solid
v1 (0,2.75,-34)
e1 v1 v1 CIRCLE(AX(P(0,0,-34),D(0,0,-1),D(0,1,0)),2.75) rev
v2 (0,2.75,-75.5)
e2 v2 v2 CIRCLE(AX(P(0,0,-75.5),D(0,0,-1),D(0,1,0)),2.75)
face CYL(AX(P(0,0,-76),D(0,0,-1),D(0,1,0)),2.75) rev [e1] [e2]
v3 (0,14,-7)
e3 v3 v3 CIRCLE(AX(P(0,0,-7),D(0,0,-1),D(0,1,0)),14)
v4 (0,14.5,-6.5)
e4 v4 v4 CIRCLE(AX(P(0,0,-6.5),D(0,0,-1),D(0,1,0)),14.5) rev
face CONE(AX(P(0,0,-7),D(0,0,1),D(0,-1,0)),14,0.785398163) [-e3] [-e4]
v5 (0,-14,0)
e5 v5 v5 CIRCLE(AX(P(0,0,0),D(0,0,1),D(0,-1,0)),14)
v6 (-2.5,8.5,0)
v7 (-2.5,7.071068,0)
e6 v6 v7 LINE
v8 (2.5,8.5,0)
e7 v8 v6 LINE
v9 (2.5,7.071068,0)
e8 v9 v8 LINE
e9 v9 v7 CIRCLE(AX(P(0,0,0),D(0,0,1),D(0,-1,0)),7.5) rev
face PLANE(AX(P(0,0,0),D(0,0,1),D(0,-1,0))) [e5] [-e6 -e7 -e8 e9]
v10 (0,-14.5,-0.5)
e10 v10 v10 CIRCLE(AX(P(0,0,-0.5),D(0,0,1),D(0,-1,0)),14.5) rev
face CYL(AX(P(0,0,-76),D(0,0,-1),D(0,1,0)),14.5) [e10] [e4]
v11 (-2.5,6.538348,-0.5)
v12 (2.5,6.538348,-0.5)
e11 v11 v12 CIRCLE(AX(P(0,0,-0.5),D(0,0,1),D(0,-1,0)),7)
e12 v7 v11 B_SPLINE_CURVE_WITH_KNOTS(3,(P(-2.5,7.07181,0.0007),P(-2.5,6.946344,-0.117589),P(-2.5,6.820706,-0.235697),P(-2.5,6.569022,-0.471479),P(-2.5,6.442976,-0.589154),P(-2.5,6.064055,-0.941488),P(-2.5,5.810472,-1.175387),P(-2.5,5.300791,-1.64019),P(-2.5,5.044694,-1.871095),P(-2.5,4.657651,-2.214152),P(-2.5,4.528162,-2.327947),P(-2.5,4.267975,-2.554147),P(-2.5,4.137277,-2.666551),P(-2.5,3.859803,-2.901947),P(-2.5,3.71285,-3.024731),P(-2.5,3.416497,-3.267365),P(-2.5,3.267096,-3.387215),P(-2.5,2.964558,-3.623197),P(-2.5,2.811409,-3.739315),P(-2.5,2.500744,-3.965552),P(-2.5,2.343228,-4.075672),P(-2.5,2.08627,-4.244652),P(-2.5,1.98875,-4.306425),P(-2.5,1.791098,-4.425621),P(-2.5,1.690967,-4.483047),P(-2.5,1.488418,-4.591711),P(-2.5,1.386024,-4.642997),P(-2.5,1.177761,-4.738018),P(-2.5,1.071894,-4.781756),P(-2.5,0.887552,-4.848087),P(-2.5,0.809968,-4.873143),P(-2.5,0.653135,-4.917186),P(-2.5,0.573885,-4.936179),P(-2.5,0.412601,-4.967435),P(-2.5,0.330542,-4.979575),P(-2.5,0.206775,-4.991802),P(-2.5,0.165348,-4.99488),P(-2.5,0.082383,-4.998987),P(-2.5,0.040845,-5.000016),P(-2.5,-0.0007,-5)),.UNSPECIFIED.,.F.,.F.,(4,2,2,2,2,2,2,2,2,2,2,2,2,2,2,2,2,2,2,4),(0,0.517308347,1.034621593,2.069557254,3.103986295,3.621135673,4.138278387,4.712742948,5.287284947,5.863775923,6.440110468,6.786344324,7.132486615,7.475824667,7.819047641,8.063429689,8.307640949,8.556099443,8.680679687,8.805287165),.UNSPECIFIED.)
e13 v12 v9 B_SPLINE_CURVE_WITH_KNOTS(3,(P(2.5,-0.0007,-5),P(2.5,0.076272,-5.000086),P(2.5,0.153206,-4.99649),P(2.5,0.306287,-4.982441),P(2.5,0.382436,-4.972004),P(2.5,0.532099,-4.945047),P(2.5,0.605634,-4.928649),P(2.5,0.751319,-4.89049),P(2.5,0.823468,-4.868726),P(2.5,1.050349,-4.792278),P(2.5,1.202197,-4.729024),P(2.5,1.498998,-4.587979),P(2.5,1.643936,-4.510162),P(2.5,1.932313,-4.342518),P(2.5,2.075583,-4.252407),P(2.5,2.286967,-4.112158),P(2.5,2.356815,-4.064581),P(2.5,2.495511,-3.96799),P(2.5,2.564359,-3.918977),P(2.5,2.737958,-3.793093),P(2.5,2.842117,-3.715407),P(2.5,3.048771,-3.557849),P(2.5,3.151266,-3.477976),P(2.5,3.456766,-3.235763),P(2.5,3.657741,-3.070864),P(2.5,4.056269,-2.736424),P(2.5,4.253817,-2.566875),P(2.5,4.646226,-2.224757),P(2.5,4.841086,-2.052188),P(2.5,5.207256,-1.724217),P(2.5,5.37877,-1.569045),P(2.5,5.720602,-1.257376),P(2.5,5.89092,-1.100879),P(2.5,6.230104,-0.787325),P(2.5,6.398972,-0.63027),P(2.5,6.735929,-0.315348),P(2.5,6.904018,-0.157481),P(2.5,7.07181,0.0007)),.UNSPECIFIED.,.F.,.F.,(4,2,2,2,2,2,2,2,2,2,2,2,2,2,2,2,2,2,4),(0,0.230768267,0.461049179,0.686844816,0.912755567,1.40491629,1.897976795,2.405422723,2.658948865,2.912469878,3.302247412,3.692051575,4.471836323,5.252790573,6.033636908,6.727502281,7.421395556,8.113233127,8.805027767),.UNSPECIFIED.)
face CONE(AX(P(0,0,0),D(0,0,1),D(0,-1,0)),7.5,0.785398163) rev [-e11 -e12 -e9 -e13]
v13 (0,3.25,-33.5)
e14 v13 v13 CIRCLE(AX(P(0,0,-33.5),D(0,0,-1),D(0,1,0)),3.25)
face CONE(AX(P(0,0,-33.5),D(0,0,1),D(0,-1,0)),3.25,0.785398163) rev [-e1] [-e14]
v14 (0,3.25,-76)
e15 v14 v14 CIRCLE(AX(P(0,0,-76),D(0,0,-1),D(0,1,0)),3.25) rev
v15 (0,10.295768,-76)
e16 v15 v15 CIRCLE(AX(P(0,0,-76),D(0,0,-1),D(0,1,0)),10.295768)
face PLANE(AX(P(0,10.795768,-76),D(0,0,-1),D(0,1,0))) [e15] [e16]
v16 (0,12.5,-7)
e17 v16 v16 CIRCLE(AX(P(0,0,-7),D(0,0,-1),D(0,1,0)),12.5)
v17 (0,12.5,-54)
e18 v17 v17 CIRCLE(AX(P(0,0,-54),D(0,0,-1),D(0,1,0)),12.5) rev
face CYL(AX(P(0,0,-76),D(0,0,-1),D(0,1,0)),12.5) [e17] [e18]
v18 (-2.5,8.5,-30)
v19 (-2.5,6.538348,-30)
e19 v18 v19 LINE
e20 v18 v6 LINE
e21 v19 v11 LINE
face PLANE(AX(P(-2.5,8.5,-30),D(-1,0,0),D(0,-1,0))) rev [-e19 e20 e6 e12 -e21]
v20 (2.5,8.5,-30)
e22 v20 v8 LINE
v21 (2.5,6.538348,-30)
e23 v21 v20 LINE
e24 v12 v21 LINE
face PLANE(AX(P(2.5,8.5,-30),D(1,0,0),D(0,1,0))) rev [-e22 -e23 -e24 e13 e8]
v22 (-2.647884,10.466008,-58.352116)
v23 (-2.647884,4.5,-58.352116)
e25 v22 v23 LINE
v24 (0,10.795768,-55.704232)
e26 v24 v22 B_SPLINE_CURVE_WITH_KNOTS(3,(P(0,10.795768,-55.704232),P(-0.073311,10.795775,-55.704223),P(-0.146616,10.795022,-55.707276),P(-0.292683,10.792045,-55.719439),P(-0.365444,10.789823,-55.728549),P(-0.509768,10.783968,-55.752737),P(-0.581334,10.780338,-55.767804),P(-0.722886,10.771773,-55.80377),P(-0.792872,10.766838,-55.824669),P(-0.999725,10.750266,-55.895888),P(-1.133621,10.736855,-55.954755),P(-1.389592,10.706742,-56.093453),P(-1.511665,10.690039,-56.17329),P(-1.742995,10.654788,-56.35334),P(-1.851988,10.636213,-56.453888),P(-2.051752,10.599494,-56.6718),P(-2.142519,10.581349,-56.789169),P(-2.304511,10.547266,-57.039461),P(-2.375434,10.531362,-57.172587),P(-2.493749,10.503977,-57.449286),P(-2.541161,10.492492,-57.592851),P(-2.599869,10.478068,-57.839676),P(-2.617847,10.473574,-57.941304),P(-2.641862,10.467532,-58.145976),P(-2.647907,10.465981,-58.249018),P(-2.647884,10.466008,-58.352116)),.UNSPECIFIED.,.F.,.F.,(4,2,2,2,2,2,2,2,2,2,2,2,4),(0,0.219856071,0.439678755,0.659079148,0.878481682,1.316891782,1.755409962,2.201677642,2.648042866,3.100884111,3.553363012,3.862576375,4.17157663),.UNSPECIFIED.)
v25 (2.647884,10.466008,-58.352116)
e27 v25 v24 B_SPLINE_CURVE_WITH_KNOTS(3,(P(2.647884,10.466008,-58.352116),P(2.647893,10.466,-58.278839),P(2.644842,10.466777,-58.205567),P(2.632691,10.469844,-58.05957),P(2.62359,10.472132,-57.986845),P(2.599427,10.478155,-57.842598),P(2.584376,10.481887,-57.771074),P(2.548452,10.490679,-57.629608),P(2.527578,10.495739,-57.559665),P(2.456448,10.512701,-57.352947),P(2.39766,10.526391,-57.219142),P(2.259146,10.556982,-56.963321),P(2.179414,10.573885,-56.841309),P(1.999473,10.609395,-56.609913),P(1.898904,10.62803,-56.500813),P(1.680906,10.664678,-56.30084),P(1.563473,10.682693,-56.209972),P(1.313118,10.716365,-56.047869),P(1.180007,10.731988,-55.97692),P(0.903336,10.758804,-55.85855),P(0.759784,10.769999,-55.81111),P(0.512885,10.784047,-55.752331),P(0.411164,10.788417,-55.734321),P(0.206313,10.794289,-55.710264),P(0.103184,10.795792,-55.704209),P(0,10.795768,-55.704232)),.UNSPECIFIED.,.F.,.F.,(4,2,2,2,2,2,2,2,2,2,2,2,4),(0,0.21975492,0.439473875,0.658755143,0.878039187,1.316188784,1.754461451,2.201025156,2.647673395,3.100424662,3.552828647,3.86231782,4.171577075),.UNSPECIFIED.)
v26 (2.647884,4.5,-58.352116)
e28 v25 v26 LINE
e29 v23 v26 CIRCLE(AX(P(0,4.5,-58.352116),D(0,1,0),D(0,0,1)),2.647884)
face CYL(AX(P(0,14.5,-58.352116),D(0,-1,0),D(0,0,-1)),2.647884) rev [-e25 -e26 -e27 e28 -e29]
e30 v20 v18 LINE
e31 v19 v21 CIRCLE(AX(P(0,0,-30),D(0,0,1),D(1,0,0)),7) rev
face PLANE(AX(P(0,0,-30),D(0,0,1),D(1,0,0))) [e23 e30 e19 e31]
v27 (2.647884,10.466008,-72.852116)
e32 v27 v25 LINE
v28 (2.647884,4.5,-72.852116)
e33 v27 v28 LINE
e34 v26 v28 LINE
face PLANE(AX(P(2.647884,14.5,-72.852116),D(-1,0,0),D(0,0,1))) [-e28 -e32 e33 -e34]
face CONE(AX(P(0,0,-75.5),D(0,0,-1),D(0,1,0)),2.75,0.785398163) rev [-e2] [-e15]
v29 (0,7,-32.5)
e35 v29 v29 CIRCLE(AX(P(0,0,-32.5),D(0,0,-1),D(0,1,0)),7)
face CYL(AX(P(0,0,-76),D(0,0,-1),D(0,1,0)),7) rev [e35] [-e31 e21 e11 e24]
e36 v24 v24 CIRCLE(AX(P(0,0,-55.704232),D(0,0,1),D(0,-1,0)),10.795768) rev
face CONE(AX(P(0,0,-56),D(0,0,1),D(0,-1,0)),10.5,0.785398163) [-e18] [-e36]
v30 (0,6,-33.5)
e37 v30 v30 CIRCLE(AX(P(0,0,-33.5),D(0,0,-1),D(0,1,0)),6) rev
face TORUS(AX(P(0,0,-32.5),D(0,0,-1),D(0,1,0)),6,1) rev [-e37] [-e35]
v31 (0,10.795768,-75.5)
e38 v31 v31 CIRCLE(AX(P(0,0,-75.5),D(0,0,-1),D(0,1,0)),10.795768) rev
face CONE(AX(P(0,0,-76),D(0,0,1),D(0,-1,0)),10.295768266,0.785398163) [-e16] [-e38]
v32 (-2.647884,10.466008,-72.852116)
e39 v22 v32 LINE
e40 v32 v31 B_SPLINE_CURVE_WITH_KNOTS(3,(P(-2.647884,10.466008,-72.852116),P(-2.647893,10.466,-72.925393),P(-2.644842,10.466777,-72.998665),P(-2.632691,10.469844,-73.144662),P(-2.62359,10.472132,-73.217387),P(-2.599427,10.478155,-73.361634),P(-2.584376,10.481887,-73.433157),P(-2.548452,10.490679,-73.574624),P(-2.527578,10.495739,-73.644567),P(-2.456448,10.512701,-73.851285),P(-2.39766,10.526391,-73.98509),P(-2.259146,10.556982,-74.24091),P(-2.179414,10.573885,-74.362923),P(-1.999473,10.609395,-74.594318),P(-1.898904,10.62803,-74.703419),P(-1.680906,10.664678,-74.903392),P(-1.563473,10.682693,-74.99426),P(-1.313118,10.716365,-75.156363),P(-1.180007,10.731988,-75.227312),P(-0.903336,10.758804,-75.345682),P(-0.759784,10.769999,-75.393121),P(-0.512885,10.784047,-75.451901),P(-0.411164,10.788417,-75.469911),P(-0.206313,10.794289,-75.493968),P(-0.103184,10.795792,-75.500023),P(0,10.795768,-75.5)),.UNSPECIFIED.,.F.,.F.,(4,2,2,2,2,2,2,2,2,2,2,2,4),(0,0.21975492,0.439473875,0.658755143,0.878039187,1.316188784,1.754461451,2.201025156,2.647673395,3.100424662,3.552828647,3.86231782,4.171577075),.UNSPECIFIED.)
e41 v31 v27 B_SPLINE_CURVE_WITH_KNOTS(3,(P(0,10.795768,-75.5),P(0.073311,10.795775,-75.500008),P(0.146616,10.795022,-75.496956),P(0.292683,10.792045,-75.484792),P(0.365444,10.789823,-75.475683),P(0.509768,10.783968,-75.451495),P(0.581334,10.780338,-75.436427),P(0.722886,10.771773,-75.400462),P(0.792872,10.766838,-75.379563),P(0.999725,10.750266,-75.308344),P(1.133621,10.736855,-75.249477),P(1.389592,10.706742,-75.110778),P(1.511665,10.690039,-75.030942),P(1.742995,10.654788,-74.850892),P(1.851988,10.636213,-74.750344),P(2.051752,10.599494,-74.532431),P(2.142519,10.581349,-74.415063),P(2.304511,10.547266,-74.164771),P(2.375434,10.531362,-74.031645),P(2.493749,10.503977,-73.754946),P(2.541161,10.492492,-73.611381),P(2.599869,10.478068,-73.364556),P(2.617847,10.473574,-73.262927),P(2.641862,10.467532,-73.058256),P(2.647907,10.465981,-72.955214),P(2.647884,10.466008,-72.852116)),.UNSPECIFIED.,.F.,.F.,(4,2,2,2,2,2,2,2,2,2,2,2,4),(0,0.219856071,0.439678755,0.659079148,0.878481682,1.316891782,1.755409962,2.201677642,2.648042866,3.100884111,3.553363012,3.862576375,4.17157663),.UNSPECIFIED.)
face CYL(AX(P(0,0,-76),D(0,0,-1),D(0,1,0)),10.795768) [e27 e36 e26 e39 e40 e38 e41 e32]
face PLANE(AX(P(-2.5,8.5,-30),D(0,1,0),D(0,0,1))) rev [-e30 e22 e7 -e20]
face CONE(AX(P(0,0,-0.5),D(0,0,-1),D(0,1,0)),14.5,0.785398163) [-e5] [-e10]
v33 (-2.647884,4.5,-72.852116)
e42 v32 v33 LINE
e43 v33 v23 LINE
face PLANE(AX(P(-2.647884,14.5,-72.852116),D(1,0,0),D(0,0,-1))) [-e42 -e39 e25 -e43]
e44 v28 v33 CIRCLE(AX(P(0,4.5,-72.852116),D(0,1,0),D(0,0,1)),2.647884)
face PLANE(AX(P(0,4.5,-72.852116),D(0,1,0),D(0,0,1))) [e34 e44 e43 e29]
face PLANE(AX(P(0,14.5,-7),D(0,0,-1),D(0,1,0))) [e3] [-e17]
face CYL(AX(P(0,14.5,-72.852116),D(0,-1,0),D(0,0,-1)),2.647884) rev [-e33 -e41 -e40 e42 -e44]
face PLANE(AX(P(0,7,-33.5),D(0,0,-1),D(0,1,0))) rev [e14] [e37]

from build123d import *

# Parameters (mm, degrees)
FILLET_1_R          = 1
CHAMFER_1_SIZE      = 0.5
CHAMFER_2_SIZE      = 2
SKETCH_4_W          = 5
SKETCH_4_H          = 8.5
CUT_EXTRUDE_1_DEPTH = 30
CUT_EXTRUDE_2_DEPTH = 80.669630349


with BuildPart() as part:
    # 草图1 → 旋转1 (revolve)
    with BuildSketch(Plane(origin=(0, 0, 0), x_dir=(0, 0, -1), z_dir=(1, 0, 0))):
        Polygon((0, 0), (0, 14.5), (7, 14.5), (7, 12.5), (56, 12.5), (56, 10.795768266), (76, 10.795768266), (76, 0), align=None)
    revolve(axis=Axis((0, 0, -76), (0, 0, 1)))

    # 草图3 → 切除-旋转1 (revolve, cut)
    with BuildSketch(Plane(origin=(0, 0, 0), x_dir=(0, 0, -1), z_dir=(1, 0, 0))):
        Polygon((0, 0), (0, 7), (33.5, 7), (33.5, 2.75), (76, 2.75), (76, 0), align=None)
    revolve(axis=Axis((0, 0, -76), (0, 0, 1)), mode=Mode.SUBTRACT)

    # 圆角1
    fillet_1_edges = [part.edges().sort_by_distance(p)[0] for p in [
        (0, -7, -33.5),
    ]]
    fillet(fillet_1_edges, radius=FILLET_1_R)

    # 倒角1
    chamfer_1_edges = [part.edges().sort_by_distance(p)[0] for p in [
        (0, -7, 0),
        (0, -2.75, -33.5),
        (0, -2.75, -76),
        (0, -10.795768266, -76),
        (0, -14.5, -7),
        (0, -14.5, 0),
    ]]
    chamfer(chamfer_1_edges, length=CHAMFER_1_SIZE)

    # 倒角2
    # the kernel refuses this chamfer: 2 mm, written as the material it takes off along each edge
    with BuildSketch(Plane(origin=(0, 0, -56), x_dir=(0, 1, 0), z_dir=(1, 0, 0))) as chamfer_2_piece_1_section:
        Polygon((12.5, CHAMFER_2_SIZE), (12.5 - CHAMFER_2_SIZE, 0), (12.5, 0), align=None)
    chamfer_2_piece_1 = revolve(axis=Axis((0, 0, -56), (0, 0, 1)), mode=Mode.PRIVATE)
    chamfer_2_piece_1 = chamfer_2_piece_1 - Plane(origin=(0, 0, -54.862135047), x_dir=(0, 1, 0), z_dir=(0, 0, -1)) * Cylinder(10.795768266, 50, mode=Mode.PRIVATE)
    add(chamfer_2_piece_1, mode=Mode.SUBTRACT)

    # 草图4 → 切除-拉伸1 (cut)
    with BuildSketch(Plane.XY):
        with Locations((0, 4.25)):
            Rectangle(SKETCH_4_W, SKETCH_4_H)
    extrude(amount=-CUT_EXTRUDE_1_DEPTH, mode=Mode.SUBTRACT)

    # 草图5 → 切除-拉伸2 (cut, through all)
    with BuildSketch(Plane(origin=(0, 4.5, 0), x_dir=(1, 0, 0), z_dir=(0, 1, 0))):
        with BuildLine():
            Line((2.647884133, 72.852115867), (2.647884133, 58.352115867))
            ThreePointArc((2.647884133, 58.352115867), (0, 55.704231734), (-2.647884133, 58.352115867))
            Line((-2.647884133, 58.352115867), (-2.647884133, 72.852115867))
            ThreePointArc((-2.647884133, 72.852115867), (0, 75.5), (2.647884133, 72.852115867))
        make_face()
    extrude(amount=CUT_EXTRUDE_2_DEPTH, mode=Mode.SUBTRACT)


solid = part.part
